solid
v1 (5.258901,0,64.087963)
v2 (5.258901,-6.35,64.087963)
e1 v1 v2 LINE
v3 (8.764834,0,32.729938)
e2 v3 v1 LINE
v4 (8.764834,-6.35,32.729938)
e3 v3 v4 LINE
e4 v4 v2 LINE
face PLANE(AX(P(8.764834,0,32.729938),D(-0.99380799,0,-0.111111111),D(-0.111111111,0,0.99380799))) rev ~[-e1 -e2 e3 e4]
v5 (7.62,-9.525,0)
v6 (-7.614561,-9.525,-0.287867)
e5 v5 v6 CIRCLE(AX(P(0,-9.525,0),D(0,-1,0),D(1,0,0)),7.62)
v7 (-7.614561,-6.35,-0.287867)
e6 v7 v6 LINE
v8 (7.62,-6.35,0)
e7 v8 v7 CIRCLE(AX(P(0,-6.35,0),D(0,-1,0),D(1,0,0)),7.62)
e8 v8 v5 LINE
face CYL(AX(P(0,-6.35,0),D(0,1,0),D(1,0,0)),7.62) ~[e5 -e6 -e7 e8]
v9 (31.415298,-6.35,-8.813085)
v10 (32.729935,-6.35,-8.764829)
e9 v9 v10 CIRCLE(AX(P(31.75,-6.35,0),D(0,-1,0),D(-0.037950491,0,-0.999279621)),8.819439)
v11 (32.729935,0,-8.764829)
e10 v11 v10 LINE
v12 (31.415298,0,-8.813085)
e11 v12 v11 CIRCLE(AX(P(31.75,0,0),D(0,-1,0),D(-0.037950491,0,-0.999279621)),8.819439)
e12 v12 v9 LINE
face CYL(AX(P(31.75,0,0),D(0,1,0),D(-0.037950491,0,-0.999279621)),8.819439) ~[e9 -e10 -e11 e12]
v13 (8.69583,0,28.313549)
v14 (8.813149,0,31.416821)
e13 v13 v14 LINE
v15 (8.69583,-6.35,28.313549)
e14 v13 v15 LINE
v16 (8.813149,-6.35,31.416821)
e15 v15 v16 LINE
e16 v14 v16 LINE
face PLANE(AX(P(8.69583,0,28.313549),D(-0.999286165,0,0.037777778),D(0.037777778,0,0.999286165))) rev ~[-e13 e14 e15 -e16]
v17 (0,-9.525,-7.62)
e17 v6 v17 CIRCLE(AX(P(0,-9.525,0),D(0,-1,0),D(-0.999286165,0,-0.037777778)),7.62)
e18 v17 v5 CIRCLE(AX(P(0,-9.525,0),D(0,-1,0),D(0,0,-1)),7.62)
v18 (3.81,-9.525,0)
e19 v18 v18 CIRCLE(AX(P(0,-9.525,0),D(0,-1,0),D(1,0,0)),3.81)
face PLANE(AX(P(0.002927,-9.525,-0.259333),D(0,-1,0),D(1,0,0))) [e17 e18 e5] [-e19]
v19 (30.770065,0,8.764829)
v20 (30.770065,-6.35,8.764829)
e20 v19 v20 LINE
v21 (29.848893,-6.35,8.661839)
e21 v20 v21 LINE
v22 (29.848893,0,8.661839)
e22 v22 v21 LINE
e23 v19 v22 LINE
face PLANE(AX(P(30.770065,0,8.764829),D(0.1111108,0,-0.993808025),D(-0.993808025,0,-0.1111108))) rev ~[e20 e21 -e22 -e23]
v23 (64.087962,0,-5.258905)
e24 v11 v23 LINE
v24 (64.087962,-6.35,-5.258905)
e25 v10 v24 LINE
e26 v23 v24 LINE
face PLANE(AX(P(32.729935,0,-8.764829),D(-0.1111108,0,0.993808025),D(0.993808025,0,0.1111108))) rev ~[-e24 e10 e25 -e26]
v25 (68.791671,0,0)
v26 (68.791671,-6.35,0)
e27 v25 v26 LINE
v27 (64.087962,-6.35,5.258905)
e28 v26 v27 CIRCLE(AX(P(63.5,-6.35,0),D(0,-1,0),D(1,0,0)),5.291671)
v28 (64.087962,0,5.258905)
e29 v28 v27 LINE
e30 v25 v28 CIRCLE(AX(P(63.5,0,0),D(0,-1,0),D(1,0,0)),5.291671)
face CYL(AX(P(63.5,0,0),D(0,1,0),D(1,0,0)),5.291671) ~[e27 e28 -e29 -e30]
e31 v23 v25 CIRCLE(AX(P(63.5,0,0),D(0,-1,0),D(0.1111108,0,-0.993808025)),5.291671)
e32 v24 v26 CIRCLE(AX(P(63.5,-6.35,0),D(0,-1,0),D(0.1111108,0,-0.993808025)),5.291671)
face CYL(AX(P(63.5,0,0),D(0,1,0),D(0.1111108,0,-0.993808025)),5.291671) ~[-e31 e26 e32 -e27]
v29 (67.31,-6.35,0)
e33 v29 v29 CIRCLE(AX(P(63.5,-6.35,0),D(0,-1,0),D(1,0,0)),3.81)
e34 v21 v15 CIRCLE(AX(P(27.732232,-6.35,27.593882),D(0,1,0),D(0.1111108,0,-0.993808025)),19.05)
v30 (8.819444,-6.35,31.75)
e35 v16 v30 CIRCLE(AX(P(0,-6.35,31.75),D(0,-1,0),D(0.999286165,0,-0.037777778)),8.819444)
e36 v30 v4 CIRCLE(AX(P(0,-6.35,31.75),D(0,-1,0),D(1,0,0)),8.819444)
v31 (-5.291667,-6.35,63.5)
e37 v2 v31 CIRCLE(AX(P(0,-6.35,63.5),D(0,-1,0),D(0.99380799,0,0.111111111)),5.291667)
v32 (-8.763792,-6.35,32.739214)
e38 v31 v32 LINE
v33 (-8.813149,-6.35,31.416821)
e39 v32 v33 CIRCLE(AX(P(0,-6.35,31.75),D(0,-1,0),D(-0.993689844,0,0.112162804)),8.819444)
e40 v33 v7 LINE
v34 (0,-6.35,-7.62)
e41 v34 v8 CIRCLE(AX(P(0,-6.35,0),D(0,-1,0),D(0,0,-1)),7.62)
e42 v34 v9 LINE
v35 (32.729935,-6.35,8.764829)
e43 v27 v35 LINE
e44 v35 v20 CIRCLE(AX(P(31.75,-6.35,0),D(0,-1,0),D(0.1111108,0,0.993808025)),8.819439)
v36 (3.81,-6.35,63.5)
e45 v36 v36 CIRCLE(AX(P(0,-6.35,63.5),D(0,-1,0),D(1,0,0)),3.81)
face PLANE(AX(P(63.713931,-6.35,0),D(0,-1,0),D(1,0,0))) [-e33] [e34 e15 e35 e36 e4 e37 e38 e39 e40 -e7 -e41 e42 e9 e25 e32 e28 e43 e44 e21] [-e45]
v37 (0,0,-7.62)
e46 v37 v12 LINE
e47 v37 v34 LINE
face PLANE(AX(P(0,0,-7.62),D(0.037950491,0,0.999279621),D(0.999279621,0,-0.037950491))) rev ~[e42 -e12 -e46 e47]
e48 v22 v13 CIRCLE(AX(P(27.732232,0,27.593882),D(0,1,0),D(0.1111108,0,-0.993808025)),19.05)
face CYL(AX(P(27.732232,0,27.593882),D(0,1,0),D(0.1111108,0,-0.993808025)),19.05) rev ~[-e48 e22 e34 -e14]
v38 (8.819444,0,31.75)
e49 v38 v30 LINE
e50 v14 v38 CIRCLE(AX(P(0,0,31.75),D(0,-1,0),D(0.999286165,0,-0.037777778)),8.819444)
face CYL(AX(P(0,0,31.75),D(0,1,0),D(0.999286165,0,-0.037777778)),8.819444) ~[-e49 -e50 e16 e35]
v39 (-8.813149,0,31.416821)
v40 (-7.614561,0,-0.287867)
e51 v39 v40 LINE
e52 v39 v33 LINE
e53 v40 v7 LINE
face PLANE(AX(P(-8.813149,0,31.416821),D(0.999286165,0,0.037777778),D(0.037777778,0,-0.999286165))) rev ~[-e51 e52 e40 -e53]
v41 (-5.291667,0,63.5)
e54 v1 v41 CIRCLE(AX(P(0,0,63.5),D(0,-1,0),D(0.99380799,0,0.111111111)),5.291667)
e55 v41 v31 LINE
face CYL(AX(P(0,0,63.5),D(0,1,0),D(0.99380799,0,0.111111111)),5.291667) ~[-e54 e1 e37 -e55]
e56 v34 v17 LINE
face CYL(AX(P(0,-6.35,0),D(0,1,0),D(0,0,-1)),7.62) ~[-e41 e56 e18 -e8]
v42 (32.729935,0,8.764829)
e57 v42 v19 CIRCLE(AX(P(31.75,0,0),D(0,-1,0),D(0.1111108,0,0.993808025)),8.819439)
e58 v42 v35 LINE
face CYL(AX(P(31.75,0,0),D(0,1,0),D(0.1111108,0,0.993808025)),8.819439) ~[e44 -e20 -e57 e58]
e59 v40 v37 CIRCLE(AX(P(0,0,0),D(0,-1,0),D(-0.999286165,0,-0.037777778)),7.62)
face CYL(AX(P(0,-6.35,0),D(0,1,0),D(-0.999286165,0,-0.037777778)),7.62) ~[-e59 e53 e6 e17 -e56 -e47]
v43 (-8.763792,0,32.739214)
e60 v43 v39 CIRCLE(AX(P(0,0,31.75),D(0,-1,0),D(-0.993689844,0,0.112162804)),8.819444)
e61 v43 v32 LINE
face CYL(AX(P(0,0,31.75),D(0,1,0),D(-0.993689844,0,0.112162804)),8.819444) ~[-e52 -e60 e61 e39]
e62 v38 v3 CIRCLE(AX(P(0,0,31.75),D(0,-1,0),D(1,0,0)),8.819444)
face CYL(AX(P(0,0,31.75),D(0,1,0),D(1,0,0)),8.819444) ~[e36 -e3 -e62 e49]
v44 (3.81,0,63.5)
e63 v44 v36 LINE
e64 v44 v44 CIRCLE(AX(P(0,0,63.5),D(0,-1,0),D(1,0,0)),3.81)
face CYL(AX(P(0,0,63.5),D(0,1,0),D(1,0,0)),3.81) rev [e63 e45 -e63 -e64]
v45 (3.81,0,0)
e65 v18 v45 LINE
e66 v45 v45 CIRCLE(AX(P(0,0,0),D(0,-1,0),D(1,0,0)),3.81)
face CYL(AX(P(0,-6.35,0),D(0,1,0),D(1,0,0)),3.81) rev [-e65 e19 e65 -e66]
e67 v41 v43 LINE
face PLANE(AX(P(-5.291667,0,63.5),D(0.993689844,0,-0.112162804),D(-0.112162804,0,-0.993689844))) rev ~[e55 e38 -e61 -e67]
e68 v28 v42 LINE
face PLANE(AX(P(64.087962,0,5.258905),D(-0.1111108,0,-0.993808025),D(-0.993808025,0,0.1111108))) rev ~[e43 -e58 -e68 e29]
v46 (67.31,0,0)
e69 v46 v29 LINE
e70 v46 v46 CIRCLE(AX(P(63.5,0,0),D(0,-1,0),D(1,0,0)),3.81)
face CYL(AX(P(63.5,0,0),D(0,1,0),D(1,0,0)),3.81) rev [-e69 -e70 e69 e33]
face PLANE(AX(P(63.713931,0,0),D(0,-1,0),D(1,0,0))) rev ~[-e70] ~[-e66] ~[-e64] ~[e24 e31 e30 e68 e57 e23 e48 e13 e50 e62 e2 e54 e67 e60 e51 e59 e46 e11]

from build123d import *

# Parameters (mm, degrees)
F0_R     = 3.81
F1_DEPTH = 6.35
F2_R     = 3.81
F3_DEPTH = 3.175


# Not quite as in the source:
# - a feature names something its author has since deleted; it is built from what else it names


with BuildPart() as f1:
    # F0 (on Front) → F1 (new body)
    with BuildSketch(Plane.XZ):
        with BuildLine():
            ThreePointArc((64.087961787, 5.2589050049), (58.2083291, 0), (64.087961787, -5.2589050049))
            ThreePointArc((64.087961787, -5.2589050049), (67.4441780635, -3.5277812174), (68.7916709, 0))
            ThreePointArc((68.7916709, 0), (67.4441780635, 3.5277812174), (64.087961787, 5.2589050049))
        make_face()
        with Locations((63.5, 0)):
            Circle(F0_R, mode=Mode.SUBTRACT)
        with BuildLine():
            ThreePointArc((5.2589006137, 64.087962963), (5.2834688034, 63.794437625), (5.2916666667, 63.5))
            ThreePointArc((5.2916666667, 63.5), (0, 58.2083333333), (-5.2916666667, 63.5))
            Line((-5.2916666667, 63.5), (-8.7637923714, 32.7392136171))
            ThreePointArc((-8.7637923714, 32.7392136171), (0.0046668449, 40.5694432097), (8.7648343562, 32.7299382716))
            Line((8.7648343562, 32.7299382716), (5.2589006137, 64.087962963))
        make_face()
        with BuildLine():
            ThreePointArc((-5.2916666667, 63.5), (0, 58.2083333333), (5.2916666667, 63.5))
            ThreePointArc((5.2916666667, 63.5), (5.2834688034, 63.794437625), (5.2589006137, 64.087962963))
            ThreePointArc((5.2589006137, 64.087962963), (-0.294437625, 68.7834688034), (-5.2916666667, 63.5))
        make_face()
        with Locations((0, 63.5)):
            Circle(F0_R, mode=Mode.SUBTRACT)
        with BuildLine():
            ThreePointArc((8.8131488161, 31.4168209877), (0, 22.9305555556), (-8.8131488161, 31.4168209877))
            Line((-8.8131488161, 31.4168209877), (-7.6145605771, -0.2878666667))
            ThreePointArc((-7.6145605771, -0.2878666667), (-0.1439590264, 7.6186400229), (7.62, 0))
            ThreePointArc((7.62, 0), (5.3881536726, -5.3881536726), (0, -7.62))
            Line((0, -7.62), (31.4152979668, -8.8130854583))
            ThreePointArc((31.4152979668, -8.8130854583), (22.9364968819, -0.3235174392), (30.7700650994, 8.7648290535))
            Line((30.7700650994, 8.7648290535), (29.8488925204, 8.6618391202))
            ThreePointArc((29.8488925204, 8.6618391202), (14.7662444168, 13.637318243), (8.6958303376, 28.313548659))
            Line((8.6958303376, 28.313548659), (8.8131488161, 31.4168209877))
        make_face()
        with BuildLine():
            ThreePointArc((30.7700650994, 8.7648290535), (22.9364968819, -0.3235174392), (31.4152979668, -8.8130854583))
            ThreePointArc((31.4152979668, -8.8130854583), (32.0735174392, -8.8135031181), (32.7299349006, -8.7648290535))
            ThreePointArc((32.7299349006, -8.7648290535), (38.3236206398, -5.8796268956), (40.5694388, 0))
            ThreePointArc((40.5694388, 0), (38.3236206398, 5.8796268956), (32.7299349006, 8.7648290535))
            ThreePointArc((32.7299349006, 8.7648290535), (31.75, 8.8194388), (30.7700650994, 8.7648290535))
        make_face()
        with BuildLine():
            ThreePointArc((40.5694388, 0), (38.3236206398, -5.8796268956), (32.7299349006, -8.7648290535))
            Line((32.7299349006, -8.7648290535), (64.087961787, -5.2589050049))
            ThreePointArc((64.087961787, -5.2589050049), (58.2083291, 0), (64.087961787, 5.2589050049))
            Line((64.087961787, 5.2589050049), (32.7299349006, 8.7648290535))
            ThreePointArc((32.7299349006, 8.7648290535), (38.3236206398, 5.8796268956), (40.5694388, 0))
        make_face()
        with BuildLine():
            ThreePointArc((7.62, 0), (-0.1439590264, 7.6186400229), (-7.6145605771, -0.2878666667))
            ThreePointArc((-7.6145605771, -0.2878666667), (-5.2853976199, -5.4889864274), (0, -7.62))
            ThreePointArc((0, -7.62), (5.3881536726, -5.3881536726), (7.62, 0))
        make_face()
        Circle(F0_R, mode=Mode.SUBTRACT)
        with BuildLine():
            ThreePointArc((8.8194444444, 31.75), (8.8057813389, 32.240729375), (8.7648343562, 32.7299382716))
            ThreePointArc((8.7648343562, 32.7299382716), (0.0046668449, 40.5694432097), (-8.7637923714, 32.7392136171))
            ThreePointArc((-8.7637923714, 32.7392136171), (-8.8133078888, 32.0789443195), (-8.8131488161, 31.4168209877))
            ThreePointArc((-8.8131488161, 31.4168209877), (0, 22.9305555556), (8.8131488161, 31.4168209877))
            ThreePointArc((8.8131488161, 31.4168209877), (8.8178703969, 31.5833807565), (8.8194444444, 31.75))
        make_face()
    extrude(amount=F1_DEPTH)

    # F2 (on face) → F3 (join)
    with BuildSketch(Plane.XZ.offset(6.35)):
        with BuildLine():
            ThreePointArc((0, -7.62), (5.3881536726, -5.3881536726), (7.62, 0))
            ThreePointArc((7.62, 0), (-0.1439590264, 7.6186400229), (-7.6145605771, -0.2878666667))
            ThreePointArc((-7.6145605771, -0.2878666667), (-5.2853976199, -5.4889864274), (0, -7.62))
        make_face()
        Circle(F2_R, mode=Mode.SUBTRACT)
    extrude(amount=F3_DEPTH)


solid = f1.part
